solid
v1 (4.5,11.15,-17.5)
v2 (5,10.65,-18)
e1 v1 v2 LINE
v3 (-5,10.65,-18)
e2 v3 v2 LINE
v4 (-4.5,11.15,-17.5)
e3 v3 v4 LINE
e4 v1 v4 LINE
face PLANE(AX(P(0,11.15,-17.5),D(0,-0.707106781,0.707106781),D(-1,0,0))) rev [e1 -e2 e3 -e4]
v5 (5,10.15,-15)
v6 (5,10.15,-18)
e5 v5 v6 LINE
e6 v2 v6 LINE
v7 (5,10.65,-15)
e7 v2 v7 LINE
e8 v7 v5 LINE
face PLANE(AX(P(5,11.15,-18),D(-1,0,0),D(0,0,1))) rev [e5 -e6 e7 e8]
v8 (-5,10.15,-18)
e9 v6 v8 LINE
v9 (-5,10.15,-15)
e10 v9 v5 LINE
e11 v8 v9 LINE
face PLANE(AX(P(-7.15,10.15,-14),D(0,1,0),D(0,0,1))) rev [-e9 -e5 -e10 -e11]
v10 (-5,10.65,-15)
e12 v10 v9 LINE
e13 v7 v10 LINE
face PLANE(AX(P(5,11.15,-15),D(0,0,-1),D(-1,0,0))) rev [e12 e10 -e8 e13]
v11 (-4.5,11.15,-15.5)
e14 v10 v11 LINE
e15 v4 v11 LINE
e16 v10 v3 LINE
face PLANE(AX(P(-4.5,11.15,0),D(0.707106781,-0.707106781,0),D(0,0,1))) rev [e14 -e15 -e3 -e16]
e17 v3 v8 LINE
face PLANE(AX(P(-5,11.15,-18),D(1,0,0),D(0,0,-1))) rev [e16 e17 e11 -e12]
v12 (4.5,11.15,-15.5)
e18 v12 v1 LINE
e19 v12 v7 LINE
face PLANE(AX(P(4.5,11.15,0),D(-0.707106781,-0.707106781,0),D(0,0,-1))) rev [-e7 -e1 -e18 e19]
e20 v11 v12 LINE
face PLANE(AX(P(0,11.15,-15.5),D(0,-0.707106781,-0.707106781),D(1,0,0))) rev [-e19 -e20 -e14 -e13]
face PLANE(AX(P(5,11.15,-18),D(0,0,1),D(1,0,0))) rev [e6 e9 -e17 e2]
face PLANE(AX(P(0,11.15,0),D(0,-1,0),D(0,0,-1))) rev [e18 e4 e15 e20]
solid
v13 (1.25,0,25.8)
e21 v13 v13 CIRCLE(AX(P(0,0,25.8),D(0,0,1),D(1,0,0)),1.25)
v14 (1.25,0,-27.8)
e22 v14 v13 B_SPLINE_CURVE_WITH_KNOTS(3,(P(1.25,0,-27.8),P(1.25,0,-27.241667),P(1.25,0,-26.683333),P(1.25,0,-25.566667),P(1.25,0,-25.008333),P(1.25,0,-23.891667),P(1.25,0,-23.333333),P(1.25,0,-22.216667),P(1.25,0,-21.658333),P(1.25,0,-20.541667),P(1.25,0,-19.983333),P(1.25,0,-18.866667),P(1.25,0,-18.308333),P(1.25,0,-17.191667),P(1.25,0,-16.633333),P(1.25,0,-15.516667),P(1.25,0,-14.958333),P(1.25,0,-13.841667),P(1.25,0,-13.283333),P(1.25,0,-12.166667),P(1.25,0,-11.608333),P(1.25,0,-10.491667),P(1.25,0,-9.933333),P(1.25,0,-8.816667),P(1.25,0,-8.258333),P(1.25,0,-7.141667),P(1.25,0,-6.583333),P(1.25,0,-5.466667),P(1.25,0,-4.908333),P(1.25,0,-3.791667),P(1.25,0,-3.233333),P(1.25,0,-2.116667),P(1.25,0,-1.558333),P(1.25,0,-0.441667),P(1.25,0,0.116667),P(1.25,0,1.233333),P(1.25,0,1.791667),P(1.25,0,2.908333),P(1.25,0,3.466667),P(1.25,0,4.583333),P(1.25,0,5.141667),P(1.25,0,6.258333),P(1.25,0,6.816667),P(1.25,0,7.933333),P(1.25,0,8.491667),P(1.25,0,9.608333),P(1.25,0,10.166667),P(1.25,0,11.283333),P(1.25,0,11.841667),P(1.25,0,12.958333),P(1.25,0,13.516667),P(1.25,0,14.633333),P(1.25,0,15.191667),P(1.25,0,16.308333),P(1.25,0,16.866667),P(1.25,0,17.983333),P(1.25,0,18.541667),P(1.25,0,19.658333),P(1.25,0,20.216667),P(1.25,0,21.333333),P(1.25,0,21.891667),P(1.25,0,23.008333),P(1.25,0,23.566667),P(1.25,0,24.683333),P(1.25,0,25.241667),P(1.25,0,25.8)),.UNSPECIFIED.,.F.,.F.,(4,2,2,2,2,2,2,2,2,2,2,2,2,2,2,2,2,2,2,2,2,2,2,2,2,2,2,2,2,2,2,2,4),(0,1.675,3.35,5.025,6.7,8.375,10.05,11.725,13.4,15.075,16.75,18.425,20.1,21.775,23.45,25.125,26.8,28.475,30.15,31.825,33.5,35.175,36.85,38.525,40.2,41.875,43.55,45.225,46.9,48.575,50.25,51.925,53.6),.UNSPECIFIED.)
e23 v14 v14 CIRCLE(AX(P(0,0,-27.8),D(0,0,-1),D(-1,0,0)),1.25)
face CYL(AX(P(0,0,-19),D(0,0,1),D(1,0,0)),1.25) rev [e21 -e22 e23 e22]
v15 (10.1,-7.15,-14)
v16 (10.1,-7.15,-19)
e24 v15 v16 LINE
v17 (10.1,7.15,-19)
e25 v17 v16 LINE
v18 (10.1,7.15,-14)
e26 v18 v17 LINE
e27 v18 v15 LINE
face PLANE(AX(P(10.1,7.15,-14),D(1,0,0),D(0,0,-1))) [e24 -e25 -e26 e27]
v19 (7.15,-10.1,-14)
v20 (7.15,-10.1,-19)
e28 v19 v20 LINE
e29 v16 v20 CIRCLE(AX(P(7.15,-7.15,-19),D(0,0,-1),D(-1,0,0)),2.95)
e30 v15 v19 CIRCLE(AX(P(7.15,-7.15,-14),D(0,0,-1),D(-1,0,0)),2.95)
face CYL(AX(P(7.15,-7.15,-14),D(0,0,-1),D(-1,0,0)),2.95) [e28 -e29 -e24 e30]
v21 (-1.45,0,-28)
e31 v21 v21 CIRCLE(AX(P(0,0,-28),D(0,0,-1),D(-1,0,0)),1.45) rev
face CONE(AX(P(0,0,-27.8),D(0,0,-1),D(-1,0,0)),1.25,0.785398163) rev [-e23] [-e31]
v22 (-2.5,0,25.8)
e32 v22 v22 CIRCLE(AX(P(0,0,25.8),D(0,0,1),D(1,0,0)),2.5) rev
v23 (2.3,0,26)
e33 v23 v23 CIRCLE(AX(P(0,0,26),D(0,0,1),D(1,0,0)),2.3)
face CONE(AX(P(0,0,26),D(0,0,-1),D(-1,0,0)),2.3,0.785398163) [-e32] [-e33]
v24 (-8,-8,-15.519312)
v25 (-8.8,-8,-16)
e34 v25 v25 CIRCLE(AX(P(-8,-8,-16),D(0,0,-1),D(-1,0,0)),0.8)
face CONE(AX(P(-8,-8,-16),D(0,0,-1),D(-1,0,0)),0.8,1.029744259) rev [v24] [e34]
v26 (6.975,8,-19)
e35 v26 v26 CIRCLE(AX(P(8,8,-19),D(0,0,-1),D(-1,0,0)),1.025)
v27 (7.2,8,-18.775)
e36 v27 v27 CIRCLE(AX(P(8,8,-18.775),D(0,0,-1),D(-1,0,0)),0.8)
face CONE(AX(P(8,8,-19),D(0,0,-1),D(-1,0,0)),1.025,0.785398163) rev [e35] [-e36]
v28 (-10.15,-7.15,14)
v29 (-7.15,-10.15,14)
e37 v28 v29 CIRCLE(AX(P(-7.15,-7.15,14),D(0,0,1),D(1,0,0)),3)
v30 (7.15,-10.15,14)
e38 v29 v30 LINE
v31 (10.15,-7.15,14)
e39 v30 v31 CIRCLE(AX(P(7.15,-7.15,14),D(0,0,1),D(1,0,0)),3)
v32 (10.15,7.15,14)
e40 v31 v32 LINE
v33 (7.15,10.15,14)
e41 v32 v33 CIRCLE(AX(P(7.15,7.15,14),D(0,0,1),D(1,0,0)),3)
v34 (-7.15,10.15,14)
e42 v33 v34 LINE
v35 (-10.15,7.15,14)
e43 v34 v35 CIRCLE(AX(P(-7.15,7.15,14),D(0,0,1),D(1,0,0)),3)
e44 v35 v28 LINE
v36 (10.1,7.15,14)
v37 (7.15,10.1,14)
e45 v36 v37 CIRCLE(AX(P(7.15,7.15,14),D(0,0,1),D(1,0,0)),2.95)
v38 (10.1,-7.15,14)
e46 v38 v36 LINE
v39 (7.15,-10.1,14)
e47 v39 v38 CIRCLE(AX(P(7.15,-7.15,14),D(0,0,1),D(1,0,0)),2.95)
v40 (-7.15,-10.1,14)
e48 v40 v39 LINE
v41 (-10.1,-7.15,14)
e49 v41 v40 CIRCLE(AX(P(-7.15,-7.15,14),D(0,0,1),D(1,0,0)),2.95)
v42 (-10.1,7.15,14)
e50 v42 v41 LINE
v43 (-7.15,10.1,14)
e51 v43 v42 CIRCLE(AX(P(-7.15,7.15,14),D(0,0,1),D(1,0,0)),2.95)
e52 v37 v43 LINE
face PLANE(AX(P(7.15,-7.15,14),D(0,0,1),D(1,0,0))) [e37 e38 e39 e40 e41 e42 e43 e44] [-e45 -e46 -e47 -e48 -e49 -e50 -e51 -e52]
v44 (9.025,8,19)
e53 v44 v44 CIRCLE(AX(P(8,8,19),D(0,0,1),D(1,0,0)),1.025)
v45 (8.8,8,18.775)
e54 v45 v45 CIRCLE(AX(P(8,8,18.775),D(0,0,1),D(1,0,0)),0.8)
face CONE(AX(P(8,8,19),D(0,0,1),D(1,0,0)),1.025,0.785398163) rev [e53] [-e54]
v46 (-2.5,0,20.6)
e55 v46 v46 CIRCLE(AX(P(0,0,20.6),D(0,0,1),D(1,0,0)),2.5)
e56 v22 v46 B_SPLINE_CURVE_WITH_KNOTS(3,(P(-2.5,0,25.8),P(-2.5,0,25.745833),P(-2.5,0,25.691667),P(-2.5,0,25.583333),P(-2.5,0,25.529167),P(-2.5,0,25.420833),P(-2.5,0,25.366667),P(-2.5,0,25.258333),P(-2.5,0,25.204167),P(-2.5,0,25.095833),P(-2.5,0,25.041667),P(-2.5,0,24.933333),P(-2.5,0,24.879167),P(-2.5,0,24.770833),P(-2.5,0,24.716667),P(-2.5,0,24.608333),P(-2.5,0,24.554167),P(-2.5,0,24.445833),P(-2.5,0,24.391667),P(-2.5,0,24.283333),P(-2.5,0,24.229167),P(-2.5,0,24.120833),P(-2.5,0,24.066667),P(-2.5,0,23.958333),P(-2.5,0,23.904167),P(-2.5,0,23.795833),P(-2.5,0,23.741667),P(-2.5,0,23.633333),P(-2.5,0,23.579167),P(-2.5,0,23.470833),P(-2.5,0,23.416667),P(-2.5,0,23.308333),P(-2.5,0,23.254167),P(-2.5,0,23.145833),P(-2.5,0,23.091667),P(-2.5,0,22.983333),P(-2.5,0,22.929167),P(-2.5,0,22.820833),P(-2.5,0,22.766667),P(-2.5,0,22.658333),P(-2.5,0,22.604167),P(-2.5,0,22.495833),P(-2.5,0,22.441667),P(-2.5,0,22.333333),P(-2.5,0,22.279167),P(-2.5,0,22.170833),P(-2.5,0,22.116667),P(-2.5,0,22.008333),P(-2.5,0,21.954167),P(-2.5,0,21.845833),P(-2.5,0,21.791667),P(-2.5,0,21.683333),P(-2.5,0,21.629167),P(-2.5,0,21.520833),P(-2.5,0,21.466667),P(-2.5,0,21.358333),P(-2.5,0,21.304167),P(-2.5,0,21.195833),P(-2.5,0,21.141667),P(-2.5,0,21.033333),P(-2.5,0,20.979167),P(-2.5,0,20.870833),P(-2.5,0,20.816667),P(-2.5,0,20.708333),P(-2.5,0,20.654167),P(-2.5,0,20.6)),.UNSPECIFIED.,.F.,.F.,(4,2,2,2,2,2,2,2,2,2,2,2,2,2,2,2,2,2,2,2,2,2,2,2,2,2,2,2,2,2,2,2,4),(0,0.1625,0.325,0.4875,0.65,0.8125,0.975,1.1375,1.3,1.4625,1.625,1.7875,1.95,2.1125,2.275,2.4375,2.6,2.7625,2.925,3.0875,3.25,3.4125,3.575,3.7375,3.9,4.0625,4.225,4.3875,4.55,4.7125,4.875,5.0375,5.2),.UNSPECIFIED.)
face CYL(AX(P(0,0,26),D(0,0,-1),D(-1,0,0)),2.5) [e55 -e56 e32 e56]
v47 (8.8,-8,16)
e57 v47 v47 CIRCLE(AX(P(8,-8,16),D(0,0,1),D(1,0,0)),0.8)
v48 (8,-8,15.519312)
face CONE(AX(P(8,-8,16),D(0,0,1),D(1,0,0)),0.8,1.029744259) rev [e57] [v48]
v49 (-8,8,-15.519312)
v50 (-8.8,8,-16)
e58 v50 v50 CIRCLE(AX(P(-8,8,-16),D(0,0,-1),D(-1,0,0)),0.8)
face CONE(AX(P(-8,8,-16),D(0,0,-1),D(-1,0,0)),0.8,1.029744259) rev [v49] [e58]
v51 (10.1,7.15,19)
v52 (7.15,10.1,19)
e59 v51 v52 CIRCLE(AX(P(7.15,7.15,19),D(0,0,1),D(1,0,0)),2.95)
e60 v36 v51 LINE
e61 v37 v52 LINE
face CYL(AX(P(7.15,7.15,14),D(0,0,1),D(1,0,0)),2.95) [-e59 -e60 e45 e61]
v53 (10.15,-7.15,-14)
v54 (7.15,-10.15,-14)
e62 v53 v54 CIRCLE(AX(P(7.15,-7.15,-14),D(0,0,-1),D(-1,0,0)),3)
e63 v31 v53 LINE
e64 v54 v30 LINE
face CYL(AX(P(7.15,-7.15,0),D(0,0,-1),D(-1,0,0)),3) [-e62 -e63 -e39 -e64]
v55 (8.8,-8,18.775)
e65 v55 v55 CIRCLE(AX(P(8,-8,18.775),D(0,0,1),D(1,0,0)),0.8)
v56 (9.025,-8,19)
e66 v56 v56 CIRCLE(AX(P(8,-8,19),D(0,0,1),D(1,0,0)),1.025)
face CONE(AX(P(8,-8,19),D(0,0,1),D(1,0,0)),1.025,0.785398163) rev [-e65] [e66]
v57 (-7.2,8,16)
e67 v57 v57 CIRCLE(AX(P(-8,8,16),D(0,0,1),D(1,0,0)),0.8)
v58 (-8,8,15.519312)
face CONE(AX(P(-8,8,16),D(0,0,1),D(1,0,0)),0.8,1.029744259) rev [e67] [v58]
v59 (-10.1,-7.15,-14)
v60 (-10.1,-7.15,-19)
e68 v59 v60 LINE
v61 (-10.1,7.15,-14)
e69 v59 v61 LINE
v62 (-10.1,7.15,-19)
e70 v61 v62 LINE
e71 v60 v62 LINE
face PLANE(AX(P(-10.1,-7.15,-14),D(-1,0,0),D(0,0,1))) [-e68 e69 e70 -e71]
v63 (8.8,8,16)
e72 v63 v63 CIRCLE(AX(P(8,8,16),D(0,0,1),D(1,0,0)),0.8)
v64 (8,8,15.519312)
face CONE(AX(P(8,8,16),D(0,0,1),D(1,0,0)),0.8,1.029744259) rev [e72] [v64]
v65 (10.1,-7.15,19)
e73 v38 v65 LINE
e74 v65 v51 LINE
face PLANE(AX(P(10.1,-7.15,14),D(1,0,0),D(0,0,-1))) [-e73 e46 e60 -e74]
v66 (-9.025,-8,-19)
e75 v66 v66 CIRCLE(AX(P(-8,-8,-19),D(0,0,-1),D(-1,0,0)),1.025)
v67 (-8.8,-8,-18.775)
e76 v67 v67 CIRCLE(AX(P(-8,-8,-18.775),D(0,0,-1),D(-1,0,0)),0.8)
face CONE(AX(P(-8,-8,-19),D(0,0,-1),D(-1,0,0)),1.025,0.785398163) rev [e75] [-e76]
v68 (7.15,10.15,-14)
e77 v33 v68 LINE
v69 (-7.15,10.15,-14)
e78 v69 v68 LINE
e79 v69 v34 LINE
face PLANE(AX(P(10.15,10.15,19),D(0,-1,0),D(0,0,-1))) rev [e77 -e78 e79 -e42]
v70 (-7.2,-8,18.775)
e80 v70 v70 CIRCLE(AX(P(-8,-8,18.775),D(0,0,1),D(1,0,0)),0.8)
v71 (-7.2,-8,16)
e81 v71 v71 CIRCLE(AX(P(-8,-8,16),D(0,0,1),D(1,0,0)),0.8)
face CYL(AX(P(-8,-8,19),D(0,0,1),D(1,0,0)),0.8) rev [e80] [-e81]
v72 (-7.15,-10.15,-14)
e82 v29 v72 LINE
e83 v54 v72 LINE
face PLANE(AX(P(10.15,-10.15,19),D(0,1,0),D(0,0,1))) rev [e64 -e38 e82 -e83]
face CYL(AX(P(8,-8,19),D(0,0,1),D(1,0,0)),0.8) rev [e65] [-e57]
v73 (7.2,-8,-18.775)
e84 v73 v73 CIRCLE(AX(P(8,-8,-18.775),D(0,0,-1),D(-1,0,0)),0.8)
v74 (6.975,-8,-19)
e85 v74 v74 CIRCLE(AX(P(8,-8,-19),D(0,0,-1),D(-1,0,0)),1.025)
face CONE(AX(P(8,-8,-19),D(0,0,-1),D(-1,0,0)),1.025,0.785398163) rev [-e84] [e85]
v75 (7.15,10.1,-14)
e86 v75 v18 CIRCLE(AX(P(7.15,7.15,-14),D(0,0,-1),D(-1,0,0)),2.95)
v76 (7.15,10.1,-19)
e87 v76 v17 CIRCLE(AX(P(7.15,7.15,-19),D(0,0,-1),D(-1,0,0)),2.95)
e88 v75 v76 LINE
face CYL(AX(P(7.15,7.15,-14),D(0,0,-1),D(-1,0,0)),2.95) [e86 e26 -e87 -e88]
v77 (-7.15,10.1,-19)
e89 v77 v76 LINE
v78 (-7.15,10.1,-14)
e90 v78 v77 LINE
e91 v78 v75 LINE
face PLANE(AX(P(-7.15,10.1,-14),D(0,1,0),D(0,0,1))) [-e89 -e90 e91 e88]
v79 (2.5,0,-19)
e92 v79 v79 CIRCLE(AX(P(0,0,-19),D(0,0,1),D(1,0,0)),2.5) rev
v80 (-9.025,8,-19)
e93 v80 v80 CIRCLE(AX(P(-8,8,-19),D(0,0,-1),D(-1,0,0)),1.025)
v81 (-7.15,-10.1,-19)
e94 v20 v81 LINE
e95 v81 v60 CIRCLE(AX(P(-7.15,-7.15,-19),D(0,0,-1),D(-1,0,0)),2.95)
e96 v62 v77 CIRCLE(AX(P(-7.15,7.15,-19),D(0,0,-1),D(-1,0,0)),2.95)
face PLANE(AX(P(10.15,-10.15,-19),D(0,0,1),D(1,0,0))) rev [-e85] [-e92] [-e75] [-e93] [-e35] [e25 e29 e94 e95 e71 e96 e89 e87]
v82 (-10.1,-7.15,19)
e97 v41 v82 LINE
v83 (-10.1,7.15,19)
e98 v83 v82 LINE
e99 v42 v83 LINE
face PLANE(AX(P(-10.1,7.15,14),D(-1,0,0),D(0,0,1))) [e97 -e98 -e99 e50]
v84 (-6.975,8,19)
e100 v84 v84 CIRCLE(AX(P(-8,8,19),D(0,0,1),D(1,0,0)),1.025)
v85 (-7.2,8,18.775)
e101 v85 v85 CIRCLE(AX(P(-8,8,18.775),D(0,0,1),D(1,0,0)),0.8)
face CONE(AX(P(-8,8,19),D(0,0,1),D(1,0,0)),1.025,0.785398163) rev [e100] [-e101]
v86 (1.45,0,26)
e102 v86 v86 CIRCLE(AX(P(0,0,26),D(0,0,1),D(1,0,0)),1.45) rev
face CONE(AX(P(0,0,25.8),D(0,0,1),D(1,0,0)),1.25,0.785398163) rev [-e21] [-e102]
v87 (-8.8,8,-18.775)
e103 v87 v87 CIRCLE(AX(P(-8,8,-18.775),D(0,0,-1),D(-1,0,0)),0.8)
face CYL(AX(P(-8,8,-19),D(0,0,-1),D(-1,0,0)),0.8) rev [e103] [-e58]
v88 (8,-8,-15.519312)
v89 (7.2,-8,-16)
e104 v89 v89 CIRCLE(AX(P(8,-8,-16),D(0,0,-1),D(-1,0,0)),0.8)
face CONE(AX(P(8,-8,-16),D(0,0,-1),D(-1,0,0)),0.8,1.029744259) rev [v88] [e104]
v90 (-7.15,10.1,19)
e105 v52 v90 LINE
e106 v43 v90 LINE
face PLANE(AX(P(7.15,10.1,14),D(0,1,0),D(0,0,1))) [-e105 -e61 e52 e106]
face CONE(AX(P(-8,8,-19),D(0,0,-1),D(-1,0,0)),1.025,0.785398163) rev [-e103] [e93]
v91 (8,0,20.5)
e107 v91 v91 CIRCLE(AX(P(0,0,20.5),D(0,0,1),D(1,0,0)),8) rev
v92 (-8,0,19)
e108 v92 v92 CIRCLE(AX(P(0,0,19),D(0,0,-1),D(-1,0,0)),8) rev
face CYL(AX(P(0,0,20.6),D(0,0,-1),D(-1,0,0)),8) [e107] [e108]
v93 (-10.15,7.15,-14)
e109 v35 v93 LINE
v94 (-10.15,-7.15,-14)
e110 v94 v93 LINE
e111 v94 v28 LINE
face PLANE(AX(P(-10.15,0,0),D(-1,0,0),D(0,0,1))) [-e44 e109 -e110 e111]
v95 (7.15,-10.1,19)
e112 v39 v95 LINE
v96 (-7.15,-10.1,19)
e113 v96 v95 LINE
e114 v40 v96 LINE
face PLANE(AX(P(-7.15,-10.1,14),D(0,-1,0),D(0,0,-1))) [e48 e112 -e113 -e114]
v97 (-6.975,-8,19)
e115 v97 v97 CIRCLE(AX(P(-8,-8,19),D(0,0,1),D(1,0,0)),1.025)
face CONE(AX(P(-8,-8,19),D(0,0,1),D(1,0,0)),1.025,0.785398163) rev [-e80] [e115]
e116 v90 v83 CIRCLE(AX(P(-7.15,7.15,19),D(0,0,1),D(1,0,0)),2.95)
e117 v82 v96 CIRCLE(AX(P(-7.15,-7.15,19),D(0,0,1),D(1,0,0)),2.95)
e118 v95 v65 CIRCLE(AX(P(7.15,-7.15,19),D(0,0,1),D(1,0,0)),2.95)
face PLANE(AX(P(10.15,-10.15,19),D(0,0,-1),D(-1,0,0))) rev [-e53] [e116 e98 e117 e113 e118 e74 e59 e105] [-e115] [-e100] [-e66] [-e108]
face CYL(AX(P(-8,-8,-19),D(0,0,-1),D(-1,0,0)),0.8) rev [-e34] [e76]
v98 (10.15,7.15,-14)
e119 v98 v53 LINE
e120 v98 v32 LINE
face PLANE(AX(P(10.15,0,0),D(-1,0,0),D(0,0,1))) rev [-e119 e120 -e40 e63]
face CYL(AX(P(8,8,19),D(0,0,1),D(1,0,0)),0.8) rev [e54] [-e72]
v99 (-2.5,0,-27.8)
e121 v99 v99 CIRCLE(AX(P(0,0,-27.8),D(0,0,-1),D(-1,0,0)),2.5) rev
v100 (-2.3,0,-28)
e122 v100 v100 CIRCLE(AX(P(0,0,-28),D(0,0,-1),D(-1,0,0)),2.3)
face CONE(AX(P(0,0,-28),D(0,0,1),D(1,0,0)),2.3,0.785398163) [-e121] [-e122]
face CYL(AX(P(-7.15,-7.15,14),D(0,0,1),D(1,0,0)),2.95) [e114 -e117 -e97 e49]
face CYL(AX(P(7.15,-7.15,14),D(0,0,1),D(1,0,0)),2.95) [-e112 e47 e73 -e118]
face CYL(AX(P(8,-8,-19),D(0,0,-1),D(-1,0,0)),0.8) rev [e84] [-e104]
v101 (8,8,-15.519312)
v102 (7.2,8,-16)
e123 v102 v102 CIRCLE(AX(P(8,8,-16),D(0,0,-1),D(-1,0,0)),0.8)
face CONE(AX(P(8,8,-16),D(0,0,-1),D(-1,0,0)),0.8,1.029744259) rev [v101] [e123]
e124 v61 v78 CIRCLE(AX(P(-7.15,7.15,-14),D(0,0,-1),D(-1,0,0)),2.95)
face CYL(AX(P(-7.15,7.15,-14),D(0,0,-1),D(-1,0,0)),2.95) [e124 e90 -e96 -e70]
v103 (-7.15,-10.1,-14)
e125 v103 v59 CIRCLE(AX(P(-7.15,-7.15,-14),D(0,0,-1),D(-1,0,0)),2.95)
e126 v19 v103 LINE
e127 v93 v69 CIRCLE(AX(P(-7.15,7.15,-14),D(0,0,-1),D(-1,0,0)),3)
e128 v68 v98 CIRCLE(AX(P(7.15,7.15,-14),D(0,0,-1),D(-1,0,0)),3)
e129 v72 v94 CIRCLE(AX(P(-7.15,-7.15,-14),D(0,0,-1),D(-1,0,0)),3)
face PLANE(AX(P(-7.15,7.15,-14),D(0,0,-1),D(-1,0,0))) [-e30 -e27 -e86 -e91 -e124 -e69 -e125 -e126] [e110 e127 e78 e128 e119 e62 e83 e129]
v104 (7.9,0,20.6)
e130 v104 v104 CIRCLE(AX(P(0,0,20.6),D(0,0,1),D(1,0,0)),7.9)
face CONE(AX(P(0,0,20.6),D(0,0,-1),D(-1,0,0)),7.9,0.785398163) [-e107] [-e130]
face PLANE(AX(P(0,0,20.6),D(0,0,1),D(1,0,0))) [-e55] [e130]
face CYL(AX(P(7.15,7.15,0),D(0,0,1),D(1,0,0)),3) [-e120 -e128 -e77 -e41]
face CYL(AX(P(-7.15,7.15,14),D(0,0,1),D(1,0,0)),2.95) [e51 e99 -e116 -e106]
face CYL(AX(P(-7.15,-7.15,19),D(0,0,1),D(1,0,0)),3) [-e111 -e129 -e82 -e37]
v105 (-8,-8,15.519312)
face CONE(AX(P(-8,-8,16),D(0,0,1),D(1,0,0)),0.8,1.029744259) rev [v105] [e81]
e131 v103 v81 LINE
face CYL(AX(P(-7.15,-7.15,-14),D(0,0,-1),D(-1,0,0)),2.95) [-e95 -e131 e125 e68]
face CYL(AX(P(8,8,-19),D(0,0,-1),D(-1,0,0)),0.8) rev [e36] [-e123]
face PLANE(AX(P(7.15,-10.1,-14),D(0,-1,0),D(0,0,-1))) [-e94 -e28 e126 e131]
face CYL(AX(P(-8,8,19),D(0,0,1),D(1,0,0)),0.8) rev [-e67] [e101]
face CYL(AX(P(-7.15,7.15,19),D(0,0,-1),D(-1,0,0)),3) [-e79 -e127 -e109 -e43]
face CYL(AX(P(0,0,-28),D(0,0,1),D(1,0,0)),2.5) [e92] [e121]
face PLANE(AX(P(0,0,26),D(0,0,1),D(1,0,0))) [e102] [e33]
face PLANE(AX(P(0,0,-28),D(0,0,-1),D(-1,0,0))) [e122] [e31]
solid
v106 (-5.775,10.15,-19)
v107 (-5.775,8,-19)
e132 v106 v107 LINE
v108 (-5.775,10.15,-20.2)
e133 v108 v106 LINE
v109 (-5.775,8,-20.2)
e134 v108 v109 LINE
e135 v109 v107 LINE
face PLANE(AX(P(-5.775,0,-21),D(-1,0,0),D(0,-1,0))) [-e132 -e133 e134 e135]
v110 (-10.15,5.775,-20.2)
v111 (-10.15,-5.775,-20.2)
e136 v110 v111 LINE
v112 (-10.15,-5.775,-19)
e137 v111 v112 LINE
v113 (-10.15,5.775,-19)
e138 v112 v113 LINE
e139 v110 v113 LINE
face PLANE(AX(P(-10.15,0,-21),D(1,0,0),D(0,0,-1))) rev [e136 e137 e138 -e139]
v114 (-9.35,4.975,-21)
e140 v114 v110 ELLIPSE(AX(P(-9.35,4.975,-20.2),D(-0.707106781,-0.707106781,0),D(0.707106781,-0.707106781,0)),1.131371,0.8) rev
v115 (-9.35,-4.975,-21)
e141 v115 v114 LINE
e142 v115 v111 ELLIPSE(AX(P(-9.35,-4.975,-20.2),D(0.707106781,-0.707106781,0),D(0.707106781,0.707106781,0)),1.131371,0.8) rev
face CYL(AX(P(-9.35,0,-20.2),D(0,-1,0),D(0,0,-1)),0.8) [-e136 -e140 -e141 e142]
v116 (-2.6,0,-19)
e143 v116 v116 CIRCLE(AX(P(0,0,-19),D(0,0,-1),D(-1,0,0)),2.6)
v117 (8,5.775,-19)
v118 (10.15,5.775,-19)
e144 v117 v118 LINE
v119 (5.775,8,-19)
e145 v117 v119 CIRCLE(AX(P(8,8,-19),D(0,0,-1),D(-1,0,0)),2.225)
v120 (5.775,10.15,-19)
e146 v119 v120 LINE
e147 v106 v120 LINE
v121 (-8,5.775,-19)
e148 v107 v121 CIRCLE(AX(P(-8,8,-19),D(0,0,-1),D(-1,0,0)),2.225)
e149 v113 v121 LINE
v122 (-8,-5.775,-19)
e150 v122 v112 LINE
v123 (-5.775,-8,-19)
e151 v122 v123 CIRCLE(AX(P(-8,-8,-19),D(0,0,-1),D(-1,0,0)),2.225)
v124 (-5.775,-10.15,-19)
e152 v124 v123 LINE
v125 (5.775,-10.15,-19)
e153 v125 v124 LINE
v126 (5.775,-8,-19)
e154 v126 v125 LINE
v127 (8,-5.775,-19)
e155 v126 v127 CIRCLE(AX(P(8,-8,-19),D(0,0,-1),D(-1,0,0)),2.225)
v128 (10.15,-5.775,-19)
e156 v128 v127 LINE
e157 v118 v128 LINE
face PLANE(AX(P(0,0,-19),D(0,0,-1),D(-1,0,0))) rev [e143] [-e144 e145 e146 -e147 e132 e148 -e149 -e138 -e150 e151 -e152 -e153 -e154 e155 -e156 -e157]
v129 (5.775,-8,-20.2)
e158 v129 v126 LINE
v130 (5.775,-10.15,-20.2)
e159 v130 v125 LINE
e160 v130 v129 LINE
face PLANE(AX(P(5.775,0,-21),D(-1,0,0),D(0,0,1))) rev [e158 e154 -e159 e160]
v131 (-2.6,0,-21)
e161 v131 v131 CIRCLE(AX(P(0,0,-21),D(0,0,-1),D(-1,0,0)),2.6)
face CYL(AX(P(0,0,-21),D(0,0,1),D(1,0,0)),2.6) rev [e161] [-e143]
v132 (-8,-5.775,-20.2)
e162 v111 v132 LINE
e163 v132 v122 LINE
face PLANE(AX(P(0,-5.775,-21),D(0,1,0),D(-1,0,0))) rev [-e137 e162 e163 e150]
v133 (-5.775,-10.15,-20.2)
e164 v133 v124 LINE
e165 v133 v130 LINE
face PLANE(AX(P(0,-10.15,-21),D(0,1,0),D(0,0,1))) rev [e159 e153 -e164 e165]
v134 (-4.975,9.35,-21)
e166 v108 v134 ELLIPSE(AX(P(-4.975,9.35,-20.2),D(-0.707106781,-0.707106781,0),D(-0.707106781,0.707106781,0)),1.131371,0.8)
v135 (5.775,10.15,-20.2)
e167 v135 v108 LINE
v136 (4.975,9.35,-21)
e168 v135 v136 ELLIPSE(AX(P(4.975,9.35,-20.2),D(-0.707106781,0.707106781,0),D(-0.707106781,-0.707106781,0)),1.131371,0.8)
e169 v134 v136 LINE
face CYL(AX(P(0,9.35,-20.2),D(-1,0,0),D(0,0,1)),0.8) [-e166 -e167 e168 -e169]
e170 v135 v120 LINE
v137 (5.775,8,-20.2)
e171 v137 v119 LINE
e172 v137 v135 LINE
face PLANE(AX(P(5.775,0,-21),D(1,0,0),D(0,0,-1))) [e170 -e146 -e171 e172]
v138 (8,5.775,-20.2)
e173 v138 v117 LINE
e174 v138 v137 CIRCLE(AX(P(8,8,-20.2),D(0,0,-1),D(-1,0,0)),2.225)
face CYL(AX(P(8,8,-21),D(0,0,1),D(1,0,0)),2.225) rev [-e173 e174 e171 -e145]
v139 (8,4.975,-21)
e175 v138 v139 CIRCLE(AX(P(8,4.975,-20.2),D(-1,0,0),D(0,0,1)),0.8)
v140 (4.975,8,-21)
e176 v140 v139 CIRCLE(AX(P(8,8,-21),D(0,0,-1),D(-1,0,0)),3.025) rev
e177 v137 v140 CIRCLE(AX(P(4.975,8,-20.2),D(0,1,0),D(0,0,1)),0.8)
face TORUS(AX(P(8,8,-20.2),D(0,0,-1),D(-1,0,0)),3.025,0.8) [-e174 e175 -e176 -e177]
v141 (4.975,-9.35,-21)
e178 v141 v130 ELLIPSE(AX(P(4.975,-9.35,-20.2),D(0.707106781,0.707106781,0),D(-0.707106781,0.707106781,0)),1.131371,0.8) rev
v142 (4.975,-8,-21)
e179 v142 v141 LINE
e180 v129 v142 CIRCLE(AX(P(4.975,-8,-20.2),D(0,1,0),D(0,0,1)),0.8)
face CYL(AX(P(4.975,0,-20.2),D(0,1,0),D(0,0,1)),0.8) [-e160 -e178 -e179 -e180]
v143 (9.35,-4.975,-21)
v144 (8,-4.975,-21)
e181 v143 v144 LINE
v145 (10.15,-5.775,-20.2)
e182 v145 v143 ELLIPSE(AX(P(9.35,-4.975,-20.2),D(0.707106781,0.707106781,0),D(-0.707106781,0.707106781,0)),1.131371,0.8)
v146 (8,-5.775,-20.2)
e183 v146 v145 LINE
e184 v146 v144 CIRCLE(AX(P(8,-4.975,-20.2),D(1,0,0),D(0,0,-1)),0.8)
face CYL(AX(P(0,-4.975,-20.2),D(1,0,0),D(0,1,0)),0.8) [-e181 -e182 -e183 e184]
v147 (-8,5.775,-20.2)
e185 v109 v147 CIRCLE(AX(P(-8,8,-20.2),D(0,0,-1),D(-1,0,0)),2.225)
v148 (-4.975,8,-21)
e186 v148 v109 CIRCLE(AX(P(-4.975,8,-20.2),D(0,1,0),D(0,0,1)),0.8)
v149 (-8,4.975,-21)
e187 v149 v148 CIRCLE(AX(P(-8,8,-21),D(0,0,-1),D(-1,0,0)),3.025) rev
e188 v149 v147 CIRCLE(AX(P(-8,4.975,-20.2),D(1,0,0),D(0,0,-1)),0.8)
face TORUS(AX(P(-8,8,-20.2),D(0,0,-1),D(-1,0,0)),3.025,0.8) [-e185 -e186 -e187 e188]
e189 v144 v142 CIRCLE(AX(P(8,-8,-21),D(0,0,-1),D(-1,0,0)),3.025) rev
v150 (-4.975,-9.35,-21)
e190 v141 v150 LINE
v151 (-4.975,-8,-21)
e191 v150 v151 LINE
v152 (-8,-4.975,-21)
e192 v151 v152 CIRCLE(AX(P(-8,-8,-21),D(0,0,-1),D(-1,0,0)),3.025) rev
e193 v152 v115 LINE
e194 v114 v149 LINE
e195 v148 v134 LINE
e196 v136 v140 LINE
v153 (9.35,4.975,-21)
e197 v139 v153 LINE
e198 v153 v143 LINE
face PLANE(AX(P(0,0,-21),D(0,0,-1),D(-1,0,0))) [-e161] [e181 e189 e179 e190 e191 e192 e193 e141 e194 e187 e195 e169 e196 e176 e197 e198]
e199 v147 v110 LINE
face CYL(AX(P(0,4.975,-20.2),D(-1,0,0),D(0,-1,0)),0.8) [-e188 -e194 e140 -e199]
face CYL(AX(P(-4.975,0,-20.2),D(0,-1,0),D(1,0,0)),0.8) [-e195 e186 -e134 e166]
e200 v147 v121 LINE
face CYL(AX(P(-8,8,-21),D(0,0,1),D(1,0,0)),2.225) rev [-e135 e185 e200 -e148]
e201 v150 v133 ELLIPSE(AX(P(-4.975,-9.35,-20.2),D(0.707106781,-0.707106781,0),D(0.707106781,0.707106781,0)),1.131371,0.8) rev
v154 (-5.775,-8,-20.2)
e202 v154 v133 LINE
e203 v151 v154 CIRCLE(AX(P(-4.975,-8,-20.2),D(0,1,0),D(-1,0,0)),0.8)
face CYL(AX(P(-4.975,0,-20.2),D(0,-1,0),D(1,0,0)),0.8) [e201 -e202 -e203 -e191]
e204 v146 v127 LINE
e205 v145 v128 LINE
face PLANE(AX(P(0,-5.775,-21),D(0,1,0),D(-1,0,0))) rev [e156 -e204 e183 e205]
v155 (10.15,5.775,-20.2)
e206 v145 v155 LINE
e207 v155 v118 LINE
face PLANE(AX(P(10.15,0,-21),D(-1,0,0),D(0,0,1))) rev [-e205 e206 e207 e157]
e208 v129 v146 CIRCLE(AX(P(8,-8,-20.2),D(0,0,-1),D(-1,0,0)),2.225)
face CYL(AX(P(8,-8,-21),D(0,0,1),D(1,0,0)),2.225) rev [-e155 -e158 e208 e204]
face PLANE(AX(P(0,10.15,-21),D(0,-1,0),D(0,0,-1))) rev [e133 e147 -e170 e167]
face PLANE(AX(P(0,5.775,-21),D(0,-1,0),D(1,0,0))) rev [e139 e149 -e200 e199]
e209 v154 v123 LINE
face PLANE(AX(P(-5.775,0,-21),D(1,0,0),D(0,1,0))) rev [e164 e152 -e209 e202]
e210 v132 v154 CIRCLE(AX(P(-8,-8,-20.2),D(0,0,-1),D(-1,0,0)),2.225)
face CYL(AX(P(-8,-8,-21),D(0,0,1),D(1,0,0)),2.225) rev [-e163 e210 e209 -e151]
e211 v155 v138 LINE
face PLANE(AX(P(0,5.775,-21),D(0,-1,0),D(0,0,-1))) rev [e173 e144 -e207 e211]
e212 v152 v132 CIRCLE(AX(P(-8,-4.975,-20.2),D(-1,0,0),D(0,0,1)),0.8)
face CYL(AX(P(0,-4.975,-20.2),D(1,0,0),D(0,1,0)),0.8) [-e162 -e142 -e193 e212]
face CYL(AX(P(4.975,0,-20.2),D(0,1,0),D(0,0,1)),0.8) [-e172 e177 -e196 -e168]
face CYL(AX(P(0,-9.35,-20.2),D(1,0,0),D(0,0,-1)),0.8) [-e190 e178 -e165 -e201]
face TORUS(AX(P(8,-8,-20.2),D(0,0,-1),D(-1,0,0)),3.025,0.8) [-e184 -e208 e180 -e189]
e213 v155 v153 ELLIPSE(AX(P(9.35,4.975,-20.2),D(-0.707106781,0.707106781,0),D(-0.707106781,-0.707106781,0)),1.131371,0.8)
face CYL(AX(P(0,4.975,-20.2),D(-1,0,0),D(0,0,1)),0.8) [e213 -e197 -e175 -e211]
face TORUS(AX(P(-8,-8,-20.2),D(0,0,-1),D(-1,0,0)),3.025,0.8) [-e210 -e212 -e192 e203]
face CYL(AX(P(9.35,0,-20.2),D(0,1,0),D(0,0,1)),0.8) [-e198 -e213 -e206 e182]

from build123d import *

# Parameters (mm, degrees)
MAIN_SKETCH_W                     = 38
MAIN_SKETCH_H                     = 20.3
MAIN_BODY_EXTRUDE_DEPTH           = 10.15
SKETCH2_R                         = 8
BOSS_EXTRUDE2_DEPTH               = 1.6
SKETCH3_R                         = 2.5
BOSS_EXTRUDE3_DEPTH               = 5.4
CUT_EXTRUDE1_DEPTH                = 48.233939069
CUT_EXTRUDE1_DEPTH_BACK           = 48.233939069
SKETCH4_R                         = 1.25
CHAMFER1_SIZE                     = 0.2
CHAMFER2_SIZE                     = 0.2
SKETCH6_R                         = 2.5
SKETCH6_R_2                       = 1.25
BOSS_EXTRUDE4_DEPTH               = 9
MOUNTING_HOLE_LOCATION_SKETCH_R   = 0.5
MOUNTING_HOLE_CUT_LOCATIONS_DEPTH = 2
CUT_EXTRUDE3_START                = -2
SKETCH8_R                         = 0.5
CUT_EXTRUDE3_DEPTH                = 2
FILLET1_R                         = 3
SKETCH10_R                        = 2.6
BOSS_EXTRUDE5_DEPTH               = 2
FILLET2_R                         = 0.8
SKETCH13_W                        = 10
SKETCH13_H                        = 3
BOSS_EXTRUDE7_DEPTH               = 1
CHAMFER3_SIZE                     = 0.5
CUT_EXTRUDE5_DEPTH                = 5
CUT_EXTRUDE6_START                = -5
CUT_EXTRUDE6_DEPTH                = 5
CHAMFER4_SIZE                     = 0.2
CHAMFER5_SIZE                     = 0.1


# Read off the part's stored shape, not the designer's step: M2 Tapped Hole1
with BuildPart() as part:
    # Main Sketch → Main Body Extrude (new, symmetric)
    with BuildSketch(Plane(origin=(0, 0, 0), x_dir=(0, 0, -1), z_dir=(1, 0, 0))):
        Rectangle(MAIN_SKETCH_W, MAIN_SKETCH_H)
    extrude(amount=MAIN_BODY_EXTRUDE_DEPTH, both=True)

    # Sketch2 → Boss-Extrude2 (add)
    with BuildSketch(Plane.XY.offset(19)):
        with Locations(Location((0, 0, 0), (0, 0, 180))):
            Circle(SKETCH2_R)
    extrude(amount=BOSS_EXTRUDE2_DEPTH)

    # Sketch3 → Boss-Extrude3 (add)
    with BuildSketch(Plane.XY.offset(20.6)):
        with Locations(Location((0, 0, 0), (0, 0, 180))):
            Circle(SKETCH3_R)
    extrude(amount=BOSS_EXTRUDE3_DEPTH)

    # Sketch4 → Cut-Extrude1 (cut, two sides: drawn at the far end of the back side and taken through both)
    with BuildSketch(Plane.XY.offset(26).offset(-CUT_EXTRUDE1_DEPTH_BACK)):
        Circle(SKETCH4_R)
    extrude(amount=CUT_EXTRUDE1_DEPTH + CUT_EXTRUDE1_DEPTH_BACK, mode=Mode.SUBTRACT)

    # Chamfer1
    chamfer1_edges = [part.edges().sort_by_distance(p)[0] for p in [
        (-1.25, 0, 26),
    ]]
    chamfer(chamfer1_edges, length=CHAMFER1_SIZE)

    # Chamfer2
    chamfer2_edges = [part.edges().sort_by_distance(p)[0] for p in [
        (2.5, 0, 26),
    ]]
    chamfer(chamfer2_edges, length=CHAMFER2_SIZE)

    # Sketch6 → Boss-Extrude4 (add)
    with BuildSketch(Plane(origin=(0, 0, -19), x_dir=(-1, 0, 0), z_dir=(0, 0, -1))):
        Circle(SKETCH6_R)
        with Locations(Location((0, 0, 0), (0, 0, 180))):
            Circle(SKETCH6_R_2, mode=Mode.SUBTRACT)
    extrude(amount=BOSS_EXTRUDE4_DEPTH)

    # Mounting Hole Location Sketch → Mounting Hole Cut Locations (cut)
    with BuildSketch(Plane.XY.offset(19)):
        with Locations((-8, 8)):
            Circle(MOUNTING_HOLE_LOCATION_SKETCH_R)
        with Locations((8, 8)):
            Circle(MOUNTING_HOLE_LOCATION_SKETCH_R)
        with Locations((8, -8)):
            Circle(MOUNTING_HOLE_LOCATION_SKETCH_R)
        with Locations((-8, -8)):
            Circle(MOUNTING_HOLE_LOCATION_SKETCH_R)
    extrude(amount=-MOUNTING_HOLE_CUT_LOCATIONS_DEPTH, mode=Mode.SUBTRACT)

    # Sketch8 → Cut-Extrude3 (cut)
    with BuildSketch(Plane(origin=(0, 0, -19), x_dir=(-1, 0, 0), z_dir=(0, 0, -1)).offset(CUT_EXTRUDE3_START)):
        with Locations(Location((8, -8, 0), (0, 0, 180))):
            Circle(SKETCH8_R)
        with Locations(Location((-8, -8, 0), (0, 0, 180))):
            Circle(SKETCH8_R)
        with Locations(Location((-8, 8, 0), (0, 0, 180))):
            Circle(SKETCH8_R)
        with Locations(Location((8, 8, 0), (0, 0, 180))):
            Circle(SKETCH8_R)
    extrude(amount=CUT_EXTRUDE3_DEPTH, mode=Mode.SUBTRACT)

    # M2 Tapped Hole1 outline → M2 Tapped Hole1 (revolve, cut)
    with BuildSketch(Plane(origin=(-8, 8, 0), x_dir=(1, 0, 0), z_dir=(0, -1, 0))):
        Polygon((0, -15.519311505), (0, -17), (0.5, -17), (0.5, -19), (1.025, -19), (0.8, -18.775), (0.8, -16), align=None)
        Polygon((0, 17), (0, 15.519311505), (0.8, 16), (0.8, 18.775), (1.025, 19), (0.5, 19), (0.5, 17), align=None)
    revolve(axis=Axis((-8, 8, 0), (0, 0, 1)), mode=Mode.SUBTRACT)

    # M2 Tapped Hole1 2 outline → M2 Tapped Hole1 2 (revolve, cut)
    with BuildSketch(Plane(origin=(8, -8, 0), x_dir=(1, 0, 0), z_dir=(0, -1, 0))):
        Polygon((0, -15.519311505), (0, -17), (0.5, -17), (0.5, -19), (1.025, -19), (0.8, -18.775), (0.8, -16), align=None)
        Polygon((0, 17), (0, 15.519311505), (0.8, 16), (0.8, 18.775), (1.025, 19), (0.5, 19), (0.5, 17), align=None)
    revolve(axis=Axis((8, -8, 0), (0, 0, 1)), mode=Mode.SUBTRACT)

    # M2 Tapped Hole1 3 outline → M2 Tapped Hole1 3 (revolve, cut)
    with BuildSketch(Plane(origin=(8, 8, 0), x_dir=(1, 0, 0), z_dir=(0, -1, 0))):
        Polygon((0, -15.519311505), (0, -17), (0.5, -17), (0.5, -19), (1.025, -19), (0.8, -18.775), (0.8, -16), align=None)
        Polygon((0, 17), (0, 15.519311505), (0.8, 16), (0.8, 18.775), (1.025, 19), (0.5, 19), (0.5, 17), align=None)
    revolve(axis=Axis((8, 8, 0), (0, 0, 1)), mode=Mode.SUBTRACT)

    # M2 Tapped Hole1 4 outline → M2 Tapped Hole1 4 (revolve, cut)
    with BuildSketch(Plane(origin=(-8, -8, 0), x_dir=(1, 0, 0), z_dir=(0, -1, 0))):
        Polygon((0, -15.519311505), (0, -17), (0.5, -17), (0.5, -19), (1.025, -19), (0.8, -18.775), (0.8, -16), align=None)
        Polygon((0, 17), (0, 15.519311505), (0.8, 16), (0.8, 18.775), (1.025, 19), (0.5, 19), (0.5, 17), align=None)
    revolve(axis=Axis((-8, -8, 0), (0, 0, 1)), mode=Mode.SUBTRACT)

    # Fillet1
    fillet1_edges = [part.edges().sort_by_distance(p)[0] for p in [
        (10.15, -10.15, 0),
        (-10.15, -10.15, 0),
        (-10.15, 10.15, 0),
        (10.15, 10.15, 0),
    ]]
    fillet(fillet1_edges, radius=FILLET1_R)

    # Sketch13 → Boss-Extrude7 (add)
    with BuildSketch(Plane(origin=(0, 10.15, 0), x_dir=(1, 0, 0), z_dir=(0, 1, 0))):
        with Locations((0, 16.5)):
            Rectangle(SKETCH13_W, SKETCH13_H)
    extrude(amount=BOSS_EXTRUDE7_DEPTH)

    # Chamfer3
    chamfer3_edges = [part.edges().sort_by_distance(p)[0] for p in [
        (-5, 11.15, -16.5),
        (0, 11.15, -15),
        (5, 11.15, -16.5),
        (0, 11.15, -18),
    ]]
    chamfer(chamfer3_edges, length=CHAMFER3_SIZE)

    # Sketch14 → Cut-Extrude5 (cut)
    with BuildSketch(Plane.XY.offset(19)):
        with BuildLine():
            Line((10.15, -7.15), (10.15, 7.15))
            ThreePointArc((10.15, 7.15), (9.271320344, 9.271320344), (7.15, 10.15))
            Line((7.15, 10.15), (-7.15, 10.15))
            ThreePointArc((-7.15, 10.15), (-9.271320344, 9.271320344), (-10.15, 7.15))
            Line((-10.15, 7.15), (-10.15, -7.15))
            ThreePointArc((-10.15, -7.15), (-9.271320344, -9.271320344), (-7.15, -10.15))
            Line((-7.15, -10.15), (7.15, -10.15))
            ThreePointArc((7.15, -10.15), (9.271320344, -9.271320344), (10.15, -7.15))
        make_face()
        with BuildLine():
            Line((10.1, -7.15), (10.1, 7.15))
            ThreePointArc((10.1, 7.15), (9.235965005, 9.235965005), (7.15, 10.1))
            Line((7.15, 10.1), (-7.15, 10.1))
            ThreePointArc((-7.15, 10.1), (-9.235965005, 9.235965005), (-10.1, 7.15))
            Line((-10.1, 7.15), (-10.1, -7.15))
            ThreePointArc((-10.1, -7.15), (-9.235965005, -9.235965005), (-7.15, -10.1))
            Line((-7.15, -10.1), (7.15, -10.1))
            ThreePointArc((7.15, -10.1), (9.235965005, -9.235965005), (10.1, -7.15))
        make_face(mode=Mode.SUBTRACT)
    extrude(amount=-CUT_EXTRUDE5_DEPTH, mode=Mode.SUBTRACT)

    # Sketch15 → Cut-Extrude6 (cut)
    with BuildSketch(Plane(origin=(0, 0, -19), x_dir=(-1, 0, 0), z_dir=(0, 0, -1)).offset(CUT_EXTRUDE6_START)):
        with BuildLine():
            Line((7.15, 10.15), (-7.15, 10.15))
            ThreePointArc((-7.15, 10.15), (-9.271320344, 9.271320344), (-10.15, 7.15))
            Line((-10.15, 7.15), (-10.15, -7.15))
            ThreePointArc((-10.15, -7.15), (-9.271320344, -9.271320344), (-7.15, -10.15))
            Line((-7.15, -10.15), (7.15, -10.15))
            ThreePointArc((7.15, -10.15), (9.271320344, -9.271320344), (10.15, -7.15))
            Line((10.15, -7.15), (10.15, 7.15))
            ThreePointArc((10.15, 7.15), (9.271320344, 9.271320344), (7.15, 10.15))
        make_face()
        with BuildLine():
            Line((-10.1, 7.15), (-10.1, -7.15))
            ThreePointArc((-10.1, -7.15), (-9.235965005, -9.235965005), (-7.15, -10.1))
            Line((-7.15, -10.1), (7.15, -10.1))
            ThreePointArc((7.15, -10.1), (9.235965005, -9.235965005), (10.1, -7.15))
            Line((10.1, -7.15), (10.1, 7.15))
            ThreePointArc((10.1, 7.15), (9.235965005, 9.235965005), (7.15, 10.1))
            Line((7.15, 10.1), (-7.15, 10.1))
            ThreePointArc((-7.15, 10.1), (-9.235965005, 9.235965005), (-10.1, 7.15))
        make_face(mode=Mode.SUBTRACT)
    extrude(amount=CUT_EXTRUDE6_DEPTH, mode=Mode.SUBTRACT)


with BuildPart() as body_2:
    # Sketch10 → Boss-Extrude5 (new body)
    with BuildSketch(Plane(origin=(0, 0, -19), x_dir=(-1, 0, 0), z_dir=(0, 0, -1))):
        with BuildLine():
            ThreePointArc((-5.775, 8), (-6.426687412, 6.426687412), (-8, 5.775))
            Line((-8, 5.775), (-10.15, 5.775))
            Line((-10.15, 5.775), (-10.15, -5.775))
            Line((-10.15, -5.775), (-8, -5.775))
            ThreePointArc((-8, -5.775), (-6.426687412, -6.426687412), (-5.775, -8))
            Line((-5.775, -8), (-5.775, -10.15))
            Line((-5.775, -10.15), (5.775, -10.15))
            Line((5.775, -10.15), (5.775, -8))
            ThreePointArc((5.775, -8), (6.426687412, -6.426687412), (8, -5.775))
            Line((8, -5.775), (10.15, -5.775))
            Line((10.15, -5.775), (10.15, 5.775))
            Line((10.15, 5.775), (8, 5.775))
            ThreePointArc((8, 5.775), (6.426687412, 6.426687412), (5.775, 8))
            Line((5.775, 8), (5.775, 10.15))
            Line((5.775, 10.15), (-5.775, 10.15))
            Line((-5.775, 10.15), (-5.775, 8))
        make_face()
        Circle(SKETCH10_R, mode=Mode.SUBTRACT)
    extrude(amount=BOSS_EXTRUDE5_DEPTH)

    # Fillet2
    fillet2_edges = [body_2.edges().sort_by_distance(p)[0] for p in [
        (-6.426687412, -6.426687412, -21),
        (-9.075, -5.775, -21),
        (-10.15, 0, -21),
        (-9.075, 5.775, -21),
        (-6.426687412, 6.426687412, -21),
        (-5.775, 9.075, -21),
        (0, 10.15, -21),
        (5.775, 9.075, -21),
        (6.426687412, 6.426687412, -21),
        (9.075, 5.775, -21),
        (10.15, 0, -21),
        (9.075, -5.775, -21),
        (6.426687412, -6.426687412, -21),
        (5.775, -9.075, -21),
        (0, -10.15, -21),
        (-5.775, -9.075, -21),
    ]]
    fillet(fillet2_edges, radius=FILLET2_R)


with BuildPart() as cut_extrude6_piece_1:
    # of the separate pieces the step leaves, piece 1, a body of its own (cut_extrude6_pieces)
    add(part.part.solids().sort_by_distance((-7.15, 10.15, -14))[0])

    # Chamfer4
    chamfer4_edges = [cut_extrude6_piece_1.edges().sort_by_distance(p)[0] for p in [
        (-1.25, 0, -28),
        (2.5, 0, -28),
    ]]
    chamfer(chamfer4_edges, length=CHAMFER4_SIZE)

    # Chamfer5
    chamfer5_edges = [cut_extrude6_piece_1.edges().sort_by_distance(p)[0] for p in [
        (8, 0, 20.6),
    ]]
    chamfer(chamfer5_edges, length=CHAMFER5_SIZE)


with BuildPart() as cut_extrude6_piece_2:
    # of the separate pieces the step leaves, piece 2, a body of its own (cut_extrude6_pieces)
    add(part.part.solids().sort_by_distance((5, 10.65, -18))[0])


solid = Compound([body_2.part, cut_extrude6_piece_1.part, cut_extrude6_piece_2.part])
